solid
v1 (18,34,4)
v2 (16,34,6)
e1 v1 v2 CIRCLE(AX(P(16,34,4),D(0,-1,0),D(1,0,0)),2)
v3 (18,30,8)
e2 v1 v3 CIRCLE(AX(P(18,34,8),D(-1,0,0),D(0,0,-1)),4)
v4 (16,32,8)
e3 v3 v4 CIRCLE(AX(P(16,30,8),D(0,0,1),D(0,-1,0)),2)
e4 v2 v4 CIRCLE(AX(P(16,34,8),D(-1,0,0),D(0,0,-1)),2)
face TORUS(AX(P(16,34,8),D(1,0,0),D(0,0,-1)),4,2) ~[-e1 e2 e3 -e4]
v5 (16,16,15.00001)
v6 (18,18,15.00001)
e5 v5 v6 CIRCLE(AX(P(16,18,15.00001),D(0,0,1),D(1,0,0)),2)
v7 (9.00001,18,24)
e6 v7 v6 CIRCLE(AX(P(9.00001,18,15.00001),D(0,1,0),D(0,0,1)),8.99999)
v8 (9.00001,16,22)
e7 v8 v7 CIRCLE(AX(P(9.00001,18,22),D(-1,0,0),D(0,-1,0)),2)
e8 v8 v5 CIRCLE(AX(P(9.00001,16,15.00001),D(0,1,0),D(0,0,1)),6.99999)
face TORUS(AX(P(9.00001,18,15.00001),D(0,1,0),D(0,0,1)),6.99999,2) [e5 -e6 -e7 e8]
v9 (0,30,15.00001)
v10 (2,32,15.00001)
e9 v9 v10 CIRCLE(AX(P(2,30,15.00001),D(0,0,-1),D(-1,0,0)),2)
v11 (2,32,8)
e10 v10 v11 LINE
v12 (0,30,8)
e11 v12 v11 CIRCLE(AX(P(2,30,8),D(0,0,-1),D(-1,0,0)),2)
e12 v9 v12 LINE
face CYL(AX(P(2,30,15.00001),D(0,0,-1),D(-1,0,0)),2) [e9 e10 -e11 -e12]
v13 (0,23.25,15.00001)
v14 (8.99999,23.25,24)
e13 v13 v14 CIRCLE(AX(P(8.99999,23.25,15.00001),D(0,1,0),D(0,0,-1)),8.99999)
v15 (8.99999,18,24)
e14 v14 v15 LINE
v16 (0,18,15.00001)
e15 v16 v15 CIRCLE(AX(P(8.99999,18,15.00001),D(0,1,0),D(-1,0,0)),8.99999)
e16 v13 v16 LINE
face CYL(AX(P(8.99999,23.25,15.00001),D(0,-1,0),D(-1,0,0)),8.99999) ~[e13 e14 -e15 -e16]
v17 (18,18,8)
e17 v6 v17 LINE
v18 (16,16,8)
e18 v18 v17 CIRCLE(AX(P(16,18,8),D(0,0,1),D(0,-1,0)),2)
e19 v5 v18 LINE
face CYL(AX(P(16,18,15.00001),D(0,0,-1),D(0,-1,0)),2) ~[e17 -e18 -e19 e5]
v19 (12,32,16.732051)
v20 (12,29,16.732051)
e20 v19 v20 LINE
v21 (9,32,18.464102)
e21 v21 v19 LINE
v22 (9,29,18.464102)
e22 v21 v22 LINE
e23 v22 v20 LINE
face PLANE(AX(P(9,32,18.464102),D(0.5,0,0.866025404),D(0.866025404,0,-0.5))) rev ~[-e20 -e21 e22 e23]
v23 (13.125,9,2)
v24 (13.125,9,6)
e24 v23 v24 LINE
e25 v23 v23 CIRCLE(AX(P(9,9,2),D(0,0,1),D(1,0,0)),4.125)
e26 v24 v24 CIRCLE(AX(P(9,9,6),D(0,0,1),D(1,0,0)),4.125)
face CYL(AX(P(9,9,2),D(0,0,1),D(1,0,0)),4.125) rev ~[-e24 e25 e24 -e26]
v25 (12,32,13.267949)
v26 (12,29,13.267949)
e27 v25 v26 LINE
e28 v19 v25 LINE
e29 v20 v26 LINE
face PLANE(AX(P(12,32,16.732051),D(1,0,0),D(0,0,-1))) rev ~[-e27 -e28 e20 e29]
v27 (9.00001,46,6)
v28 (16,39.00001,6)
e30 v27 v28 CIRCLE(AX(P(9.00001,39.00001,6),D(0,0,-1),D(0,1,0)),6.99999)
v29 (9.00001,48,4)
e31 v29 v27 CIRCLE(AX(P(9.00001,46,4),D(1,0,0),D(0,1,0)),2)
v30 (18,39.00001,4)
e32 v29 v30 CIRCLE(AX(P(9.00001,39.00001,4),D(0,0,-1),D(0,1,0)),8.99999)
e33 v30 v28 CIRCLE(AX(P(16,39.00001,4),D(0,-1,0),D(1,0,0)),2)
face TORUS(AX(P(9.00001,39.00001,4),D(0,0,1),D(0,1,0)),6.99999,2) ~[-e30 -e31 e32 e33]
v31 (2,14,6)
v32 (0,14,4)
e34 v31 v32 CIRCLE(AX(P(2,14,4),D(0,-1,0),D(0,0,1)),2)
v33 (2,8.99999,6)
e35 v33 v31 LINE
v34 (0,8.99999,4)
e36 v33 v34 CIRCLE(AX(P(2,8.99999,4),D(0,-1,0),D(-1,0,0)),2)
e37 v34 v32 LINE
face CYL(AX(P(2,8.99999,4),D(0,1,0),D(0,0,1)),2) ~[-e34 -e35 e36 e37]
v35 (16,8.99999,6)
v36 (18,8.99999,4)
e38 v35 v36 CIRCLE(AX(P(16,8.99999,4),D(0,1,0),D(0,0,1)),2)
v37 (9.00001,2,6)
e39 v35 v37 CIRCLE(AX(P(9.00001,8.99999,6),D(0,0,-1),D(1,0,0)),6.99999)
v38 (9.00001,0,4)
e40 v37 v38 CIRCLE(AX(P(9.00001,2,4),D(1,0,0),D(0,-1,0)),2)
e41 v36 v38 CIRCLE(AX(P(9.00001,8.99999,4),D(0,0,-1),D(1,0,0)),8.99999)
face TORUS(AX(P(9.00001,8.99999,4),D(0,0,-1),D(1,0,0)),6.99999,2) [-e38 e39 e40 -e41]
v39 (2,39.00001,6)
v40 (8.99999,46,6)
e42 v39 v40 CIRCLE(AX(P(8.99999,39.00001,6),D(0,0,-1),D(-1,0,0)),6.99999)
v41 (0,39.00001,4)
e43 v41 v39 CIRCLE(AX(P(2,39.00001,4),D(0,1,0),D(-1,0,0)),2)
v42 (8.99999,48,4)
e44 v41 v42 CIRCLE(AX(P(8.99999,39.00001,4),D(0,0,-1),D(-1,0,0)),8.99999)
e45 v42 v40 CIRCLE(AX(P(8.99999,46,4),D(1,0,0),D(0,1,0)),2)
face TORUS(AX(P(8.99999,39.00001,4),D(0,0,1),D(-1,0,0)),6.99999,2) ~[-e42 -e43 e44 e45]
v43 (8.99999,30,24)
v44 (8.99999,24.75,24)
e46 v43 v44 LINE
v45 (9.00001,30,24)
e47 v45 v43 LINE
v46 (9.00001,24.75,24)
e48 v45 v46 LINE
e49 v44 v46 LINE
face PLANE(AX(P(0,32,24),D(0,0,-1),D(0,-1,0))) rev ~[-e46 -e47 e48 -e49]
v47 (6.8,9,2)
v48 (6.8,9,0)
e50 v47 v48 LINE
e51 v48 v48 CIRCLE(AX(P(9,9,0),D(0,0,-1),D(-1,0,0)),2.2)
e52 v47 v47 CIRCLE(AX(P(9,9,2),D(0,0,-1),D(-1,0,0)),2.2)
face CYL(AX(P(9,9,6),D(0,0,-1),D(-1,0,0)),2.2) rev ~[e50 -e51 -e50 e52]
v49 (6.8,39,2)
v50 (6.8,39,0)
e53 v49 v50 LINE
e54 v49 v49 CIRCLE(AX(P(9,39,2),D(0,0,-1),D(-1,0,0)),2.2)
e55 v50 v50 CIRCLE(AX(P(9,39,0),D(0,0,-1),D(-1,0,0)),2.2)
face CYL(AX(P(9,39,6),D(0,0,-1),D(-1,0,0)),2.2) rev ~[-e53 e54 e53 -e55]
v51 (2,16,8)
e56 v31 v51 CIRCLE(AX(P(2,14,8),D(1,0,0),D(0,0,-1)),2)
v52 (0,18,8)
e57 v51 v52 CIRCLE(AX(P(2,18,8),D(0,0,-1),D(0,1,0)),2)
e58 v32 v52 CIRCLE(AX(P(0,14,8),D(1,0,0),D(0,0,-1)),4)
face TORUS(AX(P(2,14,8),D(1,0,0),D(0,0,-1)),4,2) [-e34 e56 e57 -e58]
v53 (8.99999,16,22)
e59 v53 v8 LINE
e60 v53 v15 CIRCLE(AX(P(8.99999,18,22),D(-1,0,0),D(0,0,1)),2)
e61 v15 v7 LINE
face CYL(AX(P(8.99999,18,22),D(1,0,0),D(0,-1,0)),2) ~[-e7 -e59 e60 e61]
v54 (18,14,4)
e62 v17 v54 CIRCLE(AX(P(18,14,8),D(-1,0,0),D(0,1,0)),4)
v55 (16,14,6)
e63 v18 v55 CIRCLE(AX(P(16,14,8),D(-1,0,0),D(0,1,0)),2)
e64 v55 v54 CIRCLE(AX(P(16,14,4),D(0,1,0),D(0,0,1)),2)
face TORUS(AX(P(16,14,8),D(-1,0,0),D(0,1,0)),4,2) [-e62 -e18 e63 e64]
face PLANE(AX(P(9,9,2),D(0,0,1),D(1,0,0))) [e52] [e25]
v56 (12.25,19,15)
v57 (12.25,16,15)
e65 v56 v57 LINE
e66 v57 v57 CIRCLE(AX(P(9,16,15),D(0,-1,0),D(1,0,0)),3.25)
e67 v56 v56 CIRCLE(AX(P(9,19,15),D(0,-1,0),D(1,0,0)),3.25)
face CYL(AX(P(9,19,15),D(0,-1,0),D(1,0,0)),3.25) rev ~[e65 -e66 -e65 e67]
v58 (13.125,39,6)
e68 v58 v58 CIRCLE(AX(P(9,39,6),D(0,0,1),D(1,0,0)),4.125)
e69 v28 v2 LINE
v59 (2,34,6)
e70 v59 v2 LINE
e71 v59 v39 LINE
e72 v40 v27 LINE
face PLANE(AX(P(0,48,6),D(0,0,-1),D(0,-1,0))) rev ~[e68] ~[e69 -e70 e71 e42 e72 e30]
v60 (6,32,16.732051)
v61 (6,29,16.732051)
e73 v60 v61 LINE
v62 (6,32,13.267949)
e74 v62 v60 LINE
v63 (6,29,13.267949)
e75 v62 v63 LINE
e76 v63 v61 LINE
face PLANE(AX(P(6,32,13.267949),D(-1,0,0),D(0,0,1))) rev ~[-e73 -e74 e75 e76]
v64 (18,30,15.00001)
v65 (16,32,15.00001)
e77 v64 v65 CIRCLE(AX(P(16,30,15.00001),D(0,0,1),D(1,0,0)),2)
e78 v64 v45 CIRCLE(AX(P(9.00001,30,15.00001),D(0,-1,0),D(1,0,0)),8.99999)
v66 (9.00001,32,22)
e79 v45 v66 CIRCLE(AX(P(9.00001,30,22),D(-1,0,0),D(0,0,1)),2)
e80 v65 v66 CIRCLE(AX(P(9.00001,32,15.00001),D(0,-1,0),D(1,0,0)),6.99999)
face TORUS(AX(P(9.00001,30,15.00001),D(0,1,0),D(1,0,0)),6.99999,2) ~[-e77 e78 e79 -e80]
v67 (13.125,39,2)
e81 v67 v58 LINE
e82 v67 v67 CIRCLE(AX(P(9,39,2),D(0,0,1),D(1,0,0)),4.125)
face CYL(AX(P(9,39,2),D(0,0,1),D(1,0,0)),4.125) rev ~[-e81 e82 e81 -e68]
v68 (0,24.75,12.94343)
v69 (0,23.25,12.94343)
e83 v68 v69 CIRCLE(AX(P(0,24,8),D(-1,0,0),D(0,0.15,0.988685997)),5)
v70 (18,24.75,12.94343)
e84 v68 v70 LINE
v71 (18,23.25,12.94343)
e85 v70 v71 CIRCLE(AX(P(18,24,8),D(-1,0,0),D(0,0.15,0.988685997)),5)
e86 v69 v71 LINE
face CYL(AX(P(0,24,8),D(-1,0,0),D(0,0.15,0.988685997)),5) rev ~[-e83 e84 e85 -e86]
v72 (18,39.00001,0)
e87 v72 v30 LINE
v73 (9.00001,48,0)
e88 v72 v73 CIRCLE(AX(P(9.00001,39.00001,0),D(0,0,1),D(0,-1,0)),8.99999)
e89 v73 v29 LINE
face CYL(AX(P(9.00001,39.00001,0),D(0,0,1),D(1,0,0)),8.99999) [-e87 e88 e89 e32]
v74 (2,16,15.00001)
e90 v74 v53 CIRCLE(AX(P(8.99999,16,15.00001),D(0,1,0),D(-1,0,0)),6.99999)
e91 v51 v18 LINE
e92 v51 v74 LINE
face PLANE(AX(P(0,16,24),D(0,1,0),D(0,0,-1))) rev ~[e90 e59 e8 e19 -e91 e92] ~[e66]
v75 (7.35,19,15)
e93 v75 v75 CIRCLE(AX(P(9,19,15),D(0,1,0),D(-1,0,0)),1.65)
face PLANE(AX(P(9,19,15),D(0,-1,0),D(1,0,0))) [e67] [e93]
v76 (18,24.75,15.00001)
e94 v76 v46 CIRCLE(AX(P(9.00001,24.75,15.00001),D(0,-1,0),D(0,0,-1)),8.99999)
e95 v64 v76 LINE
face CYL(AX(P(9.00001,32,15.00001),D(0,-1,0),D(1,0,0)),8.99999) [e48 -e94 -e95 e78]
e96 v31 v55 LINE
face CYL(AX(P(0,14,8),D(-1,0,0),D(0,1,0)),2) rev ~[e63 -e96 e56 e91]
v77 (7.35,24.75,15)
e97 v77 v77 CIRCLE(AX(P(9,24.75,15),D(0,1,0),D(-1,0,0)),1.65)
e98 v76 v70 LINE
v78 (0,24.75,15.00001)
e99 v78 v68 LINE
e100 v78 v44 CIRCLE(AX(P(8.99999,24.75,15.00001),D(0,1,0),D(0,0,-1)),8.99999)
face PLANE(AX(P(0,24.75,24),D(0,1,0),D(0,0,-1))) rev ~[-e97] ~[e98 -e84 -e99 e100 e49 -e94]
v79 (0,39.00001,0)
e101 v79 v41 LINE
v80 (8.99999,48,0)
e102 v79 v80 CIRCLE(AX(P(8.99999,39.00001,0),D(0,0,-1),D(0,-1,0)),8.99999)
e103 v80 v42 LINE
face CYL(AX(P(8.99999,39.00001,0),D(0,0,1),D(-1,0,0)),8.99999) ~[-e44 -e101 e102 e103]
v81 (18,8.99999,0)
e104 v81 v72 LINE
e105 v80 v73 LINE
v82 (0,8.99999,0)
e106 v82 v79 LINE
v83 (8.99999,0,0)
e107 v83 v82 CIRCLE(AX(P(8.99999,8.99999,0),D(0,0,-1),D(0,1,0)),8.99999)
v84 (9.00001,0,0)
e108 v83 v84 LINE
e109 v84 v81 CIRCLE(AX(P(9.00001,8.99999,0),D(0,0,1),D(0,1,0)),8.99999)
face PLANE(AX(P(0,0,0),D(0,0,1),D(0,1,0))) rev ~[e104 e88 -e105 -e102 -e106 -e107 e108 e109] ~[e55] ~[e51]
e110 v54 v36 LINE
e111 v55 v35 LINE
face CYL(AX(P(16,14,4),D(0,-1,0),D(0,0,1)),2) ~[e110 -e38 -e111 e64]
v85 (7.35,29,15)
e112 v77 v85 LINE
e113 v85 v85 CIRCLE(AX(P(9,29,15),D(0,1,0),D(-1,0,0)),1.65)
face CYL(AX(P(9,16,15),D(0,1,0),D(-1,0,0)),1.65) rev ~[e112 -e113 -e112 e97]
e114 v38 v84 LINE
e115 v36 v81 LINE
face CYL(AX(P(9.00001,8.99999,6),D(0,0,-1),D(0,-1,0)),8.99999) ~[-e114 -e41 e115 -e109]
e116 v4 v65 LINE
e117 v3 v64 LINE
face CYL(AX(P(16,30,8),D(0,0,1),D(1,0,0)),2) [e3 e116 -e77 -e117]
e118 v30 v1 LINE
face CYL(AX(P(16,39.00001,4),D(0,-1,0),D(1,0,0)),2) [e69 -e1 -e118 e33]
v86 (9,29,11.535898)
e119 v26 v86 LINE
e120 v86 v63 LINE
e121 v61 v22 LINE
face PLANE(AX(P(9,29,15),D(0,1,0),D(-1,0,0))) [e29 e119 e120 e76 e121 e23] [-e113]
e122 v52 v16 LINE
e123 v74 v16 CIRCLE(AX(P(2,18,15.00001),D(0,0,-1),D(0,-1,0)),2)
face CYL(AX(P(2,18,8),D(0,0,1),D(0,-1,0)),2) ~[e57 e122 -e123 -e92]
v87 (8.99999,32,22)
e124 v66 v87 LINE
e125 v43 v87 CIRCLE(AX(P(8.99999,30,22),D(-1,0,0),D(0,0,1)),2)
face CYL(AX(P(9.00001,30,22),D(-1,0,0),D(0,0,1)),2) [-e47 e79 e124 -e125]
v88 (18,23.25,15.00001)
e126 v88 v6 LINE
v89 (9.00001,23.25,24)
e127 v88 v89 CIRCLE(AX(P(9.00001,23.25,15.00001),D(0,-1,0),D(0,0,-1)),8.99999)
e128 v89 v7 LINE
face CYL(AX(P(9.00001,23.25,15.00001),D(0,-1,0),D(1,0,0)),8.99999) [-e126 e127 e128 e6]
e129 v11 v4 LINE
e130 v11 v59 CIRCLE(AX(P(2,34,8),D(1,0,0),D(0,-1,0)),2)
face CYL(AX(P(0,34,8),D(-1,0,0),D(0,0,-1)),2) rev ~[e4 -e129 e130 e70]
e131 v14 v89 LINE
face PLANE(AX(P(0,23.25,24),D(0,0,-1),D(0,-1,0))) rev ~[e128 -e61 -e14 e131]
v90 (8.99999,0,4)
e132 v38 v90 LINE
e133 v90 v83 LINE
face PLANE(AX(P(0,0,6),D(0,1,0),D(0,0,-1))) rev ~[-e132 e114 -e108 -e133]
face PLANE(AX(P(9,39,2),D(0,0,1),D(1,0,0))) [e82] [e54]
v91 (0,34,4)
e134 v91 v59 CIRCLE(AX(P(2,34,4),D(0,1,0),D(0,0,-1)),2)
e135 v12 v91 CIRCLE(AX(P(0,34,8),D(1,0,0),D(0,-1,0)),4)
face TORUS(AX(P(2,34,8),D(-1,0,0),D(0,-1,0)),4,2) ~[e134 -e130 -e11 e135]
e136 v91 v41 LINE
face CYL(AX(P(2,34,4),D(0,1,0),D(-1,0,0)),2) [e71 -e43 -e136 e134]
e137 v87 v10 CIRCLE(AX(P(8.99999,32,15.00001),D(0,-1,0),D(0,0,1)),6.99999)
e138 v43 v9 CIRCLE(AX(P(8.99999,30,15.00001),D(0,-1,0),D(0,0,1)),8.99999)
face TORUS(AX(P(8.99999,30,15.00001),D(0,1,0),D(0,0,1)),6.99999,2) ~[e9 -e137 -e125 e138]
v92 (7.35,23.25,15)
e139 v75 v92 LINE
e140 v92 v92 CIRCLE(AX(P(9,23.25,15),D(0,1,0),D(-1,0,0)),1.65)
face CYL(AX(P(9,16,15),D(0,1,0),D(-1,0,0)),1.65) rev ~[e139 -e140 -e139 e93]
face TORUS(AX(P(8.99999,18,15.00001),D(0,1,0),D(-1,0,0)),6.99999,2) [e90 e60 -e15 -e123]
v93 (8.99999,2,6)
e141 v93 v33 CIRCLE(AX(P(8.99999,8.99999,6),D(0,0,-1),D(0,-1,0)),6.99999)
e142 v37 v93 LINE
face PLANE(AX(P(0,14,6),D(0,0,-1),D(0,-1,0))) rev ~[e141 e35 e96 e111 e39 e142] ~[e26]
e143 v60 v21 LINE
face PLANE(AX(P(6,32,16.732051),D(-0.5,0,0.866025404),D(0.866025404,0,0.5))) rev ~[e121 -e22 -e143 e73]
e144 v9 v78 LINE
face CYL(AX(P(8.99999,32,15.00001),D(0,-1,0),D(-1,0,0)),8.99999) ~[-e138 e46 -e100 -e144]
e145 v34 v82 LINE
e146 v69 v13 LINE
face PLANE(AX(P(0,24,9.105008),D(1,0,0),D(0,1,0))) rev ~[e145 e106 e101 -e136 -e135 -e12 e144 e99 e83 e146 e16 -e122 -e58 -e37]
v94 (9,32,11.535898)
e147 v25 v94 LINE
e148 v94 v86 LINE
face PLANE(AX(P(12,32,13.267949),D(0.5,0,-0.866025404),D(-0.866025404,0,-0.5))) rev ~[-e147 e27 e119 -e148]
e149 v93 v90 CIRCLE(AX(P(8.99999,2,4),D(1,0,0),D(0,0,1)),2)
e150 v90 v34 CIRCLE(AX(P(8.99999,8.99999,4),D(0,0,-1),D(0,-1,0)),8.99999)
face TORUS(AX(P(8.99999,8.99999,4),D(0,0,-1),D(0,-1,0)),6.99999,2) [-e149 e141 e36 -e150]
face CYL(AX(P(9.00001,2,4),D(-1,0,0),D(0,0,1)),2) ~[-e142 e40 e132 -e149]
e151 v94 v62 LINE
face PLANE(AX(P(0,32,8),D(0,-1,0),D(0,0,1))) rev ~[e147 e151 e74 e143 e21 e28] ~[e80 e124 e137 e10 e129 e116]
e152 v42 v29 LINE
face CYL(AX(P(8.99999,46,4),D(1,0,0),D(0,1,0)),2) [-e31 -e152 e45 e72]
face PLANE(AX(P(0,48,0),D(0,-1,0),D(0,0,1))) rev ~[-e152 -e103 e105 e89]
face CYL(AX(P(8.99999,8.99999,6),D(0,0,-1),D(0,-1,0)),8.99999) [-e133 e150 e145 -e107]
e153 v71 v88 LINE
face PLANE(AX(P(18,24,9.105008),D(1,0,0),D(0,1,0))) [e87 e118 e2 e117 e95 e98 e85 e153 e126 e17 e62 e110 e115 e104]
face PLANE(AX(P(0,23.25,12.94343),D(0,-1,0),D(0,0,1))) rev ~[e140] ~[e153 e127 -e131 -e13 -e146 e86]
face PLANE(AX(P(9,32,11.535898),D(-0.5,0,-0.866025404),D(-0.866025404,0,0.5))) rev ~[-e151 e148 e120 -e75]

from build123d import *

# Parameters (mm, degrees)
F1_DEPTH       = 18
F4_D           = 4.4
F4_CBORE_D     = 8.25
F4_CBORE_DEPTH = 4
F5_R           = 8.99999
F6_R           = 2
F7_D           = 3.3
F7_CBORE_D     = 6.5
F7_CBORE_DEPTH = 3
F9_DEPTH       = 3


# Not quite as in the source:
# - a fillet or chamfer is up to 0.001 mm smaller than in the source, because OpenCascade refuses the exact size


with BuildPart() as f1:
    # F0 (on Right) → F1 (new body)
    with BuildSketch(Plane.YZ):
        with BuildLine():
            Line((0, 6), (0, 0))
            Line((0, 0), (48, 0))
            Line((48, 0), (48, 6))
            Line((48, 6), (34, 6))
            ThreePointArc((34, 6), (32.5857864376, 6.5857864376), (32, 8))
            Line((32, 8), (32, 24))
            Line((32, 24), (24.75, 24))
            Line((24.75, 24), (24.75, 12.9434299833))
            ThreePointArc((24.75, 12.9434299833), (24, 3), (23.25, 12.9434299833))
            Line((23.25, 12.9434299833), (23.25, 24))
            Line((23.25, 24), (16, 24))
            Line((16, 24), (16, 8))
            ThreePointArc((16, 8), (15.4142135624, 6.5857864376), (14, 6))
            Line((14, 6), (0, 6))
        make_face()
    extrude(amount=F1_DEPTH)

    # F4 (through all)
    with Locations(Plane.XY.offset(6)):
        with Locations((9, 9), (9, 39)):
            CounterBoreHole(F4_D / 2, F4_CBORE_D / 2, F4_CBORE_DEPTH)

    # F5 (radius 9 in the source; OpenCascade refuses exactly that, so slightly less here)
    f5_edges = [f1.edges().sort_by_distance(p)[0] for p in [
        (18, 0, 3),
        (0, 0, 3),
        (18, 48, 3),
        (0, 48, 3),
        (0, 28.375, 24),
        (0, 19.625, 24),
        (18, 19.625, 24),
        (18, 28.375, 24),
    ]]
    fillet(f5_edges, radius=F5_R)

    # F6
    f6_edges = [f1.edges().sort_by_distance(p)[0] for p in [
        (18, 11.499995, 6),
        (18, 36.500005, 6),
    ]]
    fillet(f6_edges, radius=F6_R)

    # F7 (through all)
    with Locations(Plane.XZ.offset(-16)):
        with Locations((9, 15)):
            CounterBoreHole(F7_D / 2, F7_CBORE_D / 2, F7_CBORE_DEPTH)

    # F8 (on face) → F9 (cut)
    with BuildSketch(Plane(origin=(0, 32, 0), x_dir=(-1, 0, 0), z_dir=(0, 1, 0))):
        Polygon((-6, 13.2679491924), (-6, 16.7320508076), (-9, 18.4641016151), (-12, 16.7320508076), (-12, 13.2679491924), (-9, 11.5358983849), align=None)
    extrude(amount=-F9_DEPTH, mode=Mode.SUBTRACT)


solid = f1.part
